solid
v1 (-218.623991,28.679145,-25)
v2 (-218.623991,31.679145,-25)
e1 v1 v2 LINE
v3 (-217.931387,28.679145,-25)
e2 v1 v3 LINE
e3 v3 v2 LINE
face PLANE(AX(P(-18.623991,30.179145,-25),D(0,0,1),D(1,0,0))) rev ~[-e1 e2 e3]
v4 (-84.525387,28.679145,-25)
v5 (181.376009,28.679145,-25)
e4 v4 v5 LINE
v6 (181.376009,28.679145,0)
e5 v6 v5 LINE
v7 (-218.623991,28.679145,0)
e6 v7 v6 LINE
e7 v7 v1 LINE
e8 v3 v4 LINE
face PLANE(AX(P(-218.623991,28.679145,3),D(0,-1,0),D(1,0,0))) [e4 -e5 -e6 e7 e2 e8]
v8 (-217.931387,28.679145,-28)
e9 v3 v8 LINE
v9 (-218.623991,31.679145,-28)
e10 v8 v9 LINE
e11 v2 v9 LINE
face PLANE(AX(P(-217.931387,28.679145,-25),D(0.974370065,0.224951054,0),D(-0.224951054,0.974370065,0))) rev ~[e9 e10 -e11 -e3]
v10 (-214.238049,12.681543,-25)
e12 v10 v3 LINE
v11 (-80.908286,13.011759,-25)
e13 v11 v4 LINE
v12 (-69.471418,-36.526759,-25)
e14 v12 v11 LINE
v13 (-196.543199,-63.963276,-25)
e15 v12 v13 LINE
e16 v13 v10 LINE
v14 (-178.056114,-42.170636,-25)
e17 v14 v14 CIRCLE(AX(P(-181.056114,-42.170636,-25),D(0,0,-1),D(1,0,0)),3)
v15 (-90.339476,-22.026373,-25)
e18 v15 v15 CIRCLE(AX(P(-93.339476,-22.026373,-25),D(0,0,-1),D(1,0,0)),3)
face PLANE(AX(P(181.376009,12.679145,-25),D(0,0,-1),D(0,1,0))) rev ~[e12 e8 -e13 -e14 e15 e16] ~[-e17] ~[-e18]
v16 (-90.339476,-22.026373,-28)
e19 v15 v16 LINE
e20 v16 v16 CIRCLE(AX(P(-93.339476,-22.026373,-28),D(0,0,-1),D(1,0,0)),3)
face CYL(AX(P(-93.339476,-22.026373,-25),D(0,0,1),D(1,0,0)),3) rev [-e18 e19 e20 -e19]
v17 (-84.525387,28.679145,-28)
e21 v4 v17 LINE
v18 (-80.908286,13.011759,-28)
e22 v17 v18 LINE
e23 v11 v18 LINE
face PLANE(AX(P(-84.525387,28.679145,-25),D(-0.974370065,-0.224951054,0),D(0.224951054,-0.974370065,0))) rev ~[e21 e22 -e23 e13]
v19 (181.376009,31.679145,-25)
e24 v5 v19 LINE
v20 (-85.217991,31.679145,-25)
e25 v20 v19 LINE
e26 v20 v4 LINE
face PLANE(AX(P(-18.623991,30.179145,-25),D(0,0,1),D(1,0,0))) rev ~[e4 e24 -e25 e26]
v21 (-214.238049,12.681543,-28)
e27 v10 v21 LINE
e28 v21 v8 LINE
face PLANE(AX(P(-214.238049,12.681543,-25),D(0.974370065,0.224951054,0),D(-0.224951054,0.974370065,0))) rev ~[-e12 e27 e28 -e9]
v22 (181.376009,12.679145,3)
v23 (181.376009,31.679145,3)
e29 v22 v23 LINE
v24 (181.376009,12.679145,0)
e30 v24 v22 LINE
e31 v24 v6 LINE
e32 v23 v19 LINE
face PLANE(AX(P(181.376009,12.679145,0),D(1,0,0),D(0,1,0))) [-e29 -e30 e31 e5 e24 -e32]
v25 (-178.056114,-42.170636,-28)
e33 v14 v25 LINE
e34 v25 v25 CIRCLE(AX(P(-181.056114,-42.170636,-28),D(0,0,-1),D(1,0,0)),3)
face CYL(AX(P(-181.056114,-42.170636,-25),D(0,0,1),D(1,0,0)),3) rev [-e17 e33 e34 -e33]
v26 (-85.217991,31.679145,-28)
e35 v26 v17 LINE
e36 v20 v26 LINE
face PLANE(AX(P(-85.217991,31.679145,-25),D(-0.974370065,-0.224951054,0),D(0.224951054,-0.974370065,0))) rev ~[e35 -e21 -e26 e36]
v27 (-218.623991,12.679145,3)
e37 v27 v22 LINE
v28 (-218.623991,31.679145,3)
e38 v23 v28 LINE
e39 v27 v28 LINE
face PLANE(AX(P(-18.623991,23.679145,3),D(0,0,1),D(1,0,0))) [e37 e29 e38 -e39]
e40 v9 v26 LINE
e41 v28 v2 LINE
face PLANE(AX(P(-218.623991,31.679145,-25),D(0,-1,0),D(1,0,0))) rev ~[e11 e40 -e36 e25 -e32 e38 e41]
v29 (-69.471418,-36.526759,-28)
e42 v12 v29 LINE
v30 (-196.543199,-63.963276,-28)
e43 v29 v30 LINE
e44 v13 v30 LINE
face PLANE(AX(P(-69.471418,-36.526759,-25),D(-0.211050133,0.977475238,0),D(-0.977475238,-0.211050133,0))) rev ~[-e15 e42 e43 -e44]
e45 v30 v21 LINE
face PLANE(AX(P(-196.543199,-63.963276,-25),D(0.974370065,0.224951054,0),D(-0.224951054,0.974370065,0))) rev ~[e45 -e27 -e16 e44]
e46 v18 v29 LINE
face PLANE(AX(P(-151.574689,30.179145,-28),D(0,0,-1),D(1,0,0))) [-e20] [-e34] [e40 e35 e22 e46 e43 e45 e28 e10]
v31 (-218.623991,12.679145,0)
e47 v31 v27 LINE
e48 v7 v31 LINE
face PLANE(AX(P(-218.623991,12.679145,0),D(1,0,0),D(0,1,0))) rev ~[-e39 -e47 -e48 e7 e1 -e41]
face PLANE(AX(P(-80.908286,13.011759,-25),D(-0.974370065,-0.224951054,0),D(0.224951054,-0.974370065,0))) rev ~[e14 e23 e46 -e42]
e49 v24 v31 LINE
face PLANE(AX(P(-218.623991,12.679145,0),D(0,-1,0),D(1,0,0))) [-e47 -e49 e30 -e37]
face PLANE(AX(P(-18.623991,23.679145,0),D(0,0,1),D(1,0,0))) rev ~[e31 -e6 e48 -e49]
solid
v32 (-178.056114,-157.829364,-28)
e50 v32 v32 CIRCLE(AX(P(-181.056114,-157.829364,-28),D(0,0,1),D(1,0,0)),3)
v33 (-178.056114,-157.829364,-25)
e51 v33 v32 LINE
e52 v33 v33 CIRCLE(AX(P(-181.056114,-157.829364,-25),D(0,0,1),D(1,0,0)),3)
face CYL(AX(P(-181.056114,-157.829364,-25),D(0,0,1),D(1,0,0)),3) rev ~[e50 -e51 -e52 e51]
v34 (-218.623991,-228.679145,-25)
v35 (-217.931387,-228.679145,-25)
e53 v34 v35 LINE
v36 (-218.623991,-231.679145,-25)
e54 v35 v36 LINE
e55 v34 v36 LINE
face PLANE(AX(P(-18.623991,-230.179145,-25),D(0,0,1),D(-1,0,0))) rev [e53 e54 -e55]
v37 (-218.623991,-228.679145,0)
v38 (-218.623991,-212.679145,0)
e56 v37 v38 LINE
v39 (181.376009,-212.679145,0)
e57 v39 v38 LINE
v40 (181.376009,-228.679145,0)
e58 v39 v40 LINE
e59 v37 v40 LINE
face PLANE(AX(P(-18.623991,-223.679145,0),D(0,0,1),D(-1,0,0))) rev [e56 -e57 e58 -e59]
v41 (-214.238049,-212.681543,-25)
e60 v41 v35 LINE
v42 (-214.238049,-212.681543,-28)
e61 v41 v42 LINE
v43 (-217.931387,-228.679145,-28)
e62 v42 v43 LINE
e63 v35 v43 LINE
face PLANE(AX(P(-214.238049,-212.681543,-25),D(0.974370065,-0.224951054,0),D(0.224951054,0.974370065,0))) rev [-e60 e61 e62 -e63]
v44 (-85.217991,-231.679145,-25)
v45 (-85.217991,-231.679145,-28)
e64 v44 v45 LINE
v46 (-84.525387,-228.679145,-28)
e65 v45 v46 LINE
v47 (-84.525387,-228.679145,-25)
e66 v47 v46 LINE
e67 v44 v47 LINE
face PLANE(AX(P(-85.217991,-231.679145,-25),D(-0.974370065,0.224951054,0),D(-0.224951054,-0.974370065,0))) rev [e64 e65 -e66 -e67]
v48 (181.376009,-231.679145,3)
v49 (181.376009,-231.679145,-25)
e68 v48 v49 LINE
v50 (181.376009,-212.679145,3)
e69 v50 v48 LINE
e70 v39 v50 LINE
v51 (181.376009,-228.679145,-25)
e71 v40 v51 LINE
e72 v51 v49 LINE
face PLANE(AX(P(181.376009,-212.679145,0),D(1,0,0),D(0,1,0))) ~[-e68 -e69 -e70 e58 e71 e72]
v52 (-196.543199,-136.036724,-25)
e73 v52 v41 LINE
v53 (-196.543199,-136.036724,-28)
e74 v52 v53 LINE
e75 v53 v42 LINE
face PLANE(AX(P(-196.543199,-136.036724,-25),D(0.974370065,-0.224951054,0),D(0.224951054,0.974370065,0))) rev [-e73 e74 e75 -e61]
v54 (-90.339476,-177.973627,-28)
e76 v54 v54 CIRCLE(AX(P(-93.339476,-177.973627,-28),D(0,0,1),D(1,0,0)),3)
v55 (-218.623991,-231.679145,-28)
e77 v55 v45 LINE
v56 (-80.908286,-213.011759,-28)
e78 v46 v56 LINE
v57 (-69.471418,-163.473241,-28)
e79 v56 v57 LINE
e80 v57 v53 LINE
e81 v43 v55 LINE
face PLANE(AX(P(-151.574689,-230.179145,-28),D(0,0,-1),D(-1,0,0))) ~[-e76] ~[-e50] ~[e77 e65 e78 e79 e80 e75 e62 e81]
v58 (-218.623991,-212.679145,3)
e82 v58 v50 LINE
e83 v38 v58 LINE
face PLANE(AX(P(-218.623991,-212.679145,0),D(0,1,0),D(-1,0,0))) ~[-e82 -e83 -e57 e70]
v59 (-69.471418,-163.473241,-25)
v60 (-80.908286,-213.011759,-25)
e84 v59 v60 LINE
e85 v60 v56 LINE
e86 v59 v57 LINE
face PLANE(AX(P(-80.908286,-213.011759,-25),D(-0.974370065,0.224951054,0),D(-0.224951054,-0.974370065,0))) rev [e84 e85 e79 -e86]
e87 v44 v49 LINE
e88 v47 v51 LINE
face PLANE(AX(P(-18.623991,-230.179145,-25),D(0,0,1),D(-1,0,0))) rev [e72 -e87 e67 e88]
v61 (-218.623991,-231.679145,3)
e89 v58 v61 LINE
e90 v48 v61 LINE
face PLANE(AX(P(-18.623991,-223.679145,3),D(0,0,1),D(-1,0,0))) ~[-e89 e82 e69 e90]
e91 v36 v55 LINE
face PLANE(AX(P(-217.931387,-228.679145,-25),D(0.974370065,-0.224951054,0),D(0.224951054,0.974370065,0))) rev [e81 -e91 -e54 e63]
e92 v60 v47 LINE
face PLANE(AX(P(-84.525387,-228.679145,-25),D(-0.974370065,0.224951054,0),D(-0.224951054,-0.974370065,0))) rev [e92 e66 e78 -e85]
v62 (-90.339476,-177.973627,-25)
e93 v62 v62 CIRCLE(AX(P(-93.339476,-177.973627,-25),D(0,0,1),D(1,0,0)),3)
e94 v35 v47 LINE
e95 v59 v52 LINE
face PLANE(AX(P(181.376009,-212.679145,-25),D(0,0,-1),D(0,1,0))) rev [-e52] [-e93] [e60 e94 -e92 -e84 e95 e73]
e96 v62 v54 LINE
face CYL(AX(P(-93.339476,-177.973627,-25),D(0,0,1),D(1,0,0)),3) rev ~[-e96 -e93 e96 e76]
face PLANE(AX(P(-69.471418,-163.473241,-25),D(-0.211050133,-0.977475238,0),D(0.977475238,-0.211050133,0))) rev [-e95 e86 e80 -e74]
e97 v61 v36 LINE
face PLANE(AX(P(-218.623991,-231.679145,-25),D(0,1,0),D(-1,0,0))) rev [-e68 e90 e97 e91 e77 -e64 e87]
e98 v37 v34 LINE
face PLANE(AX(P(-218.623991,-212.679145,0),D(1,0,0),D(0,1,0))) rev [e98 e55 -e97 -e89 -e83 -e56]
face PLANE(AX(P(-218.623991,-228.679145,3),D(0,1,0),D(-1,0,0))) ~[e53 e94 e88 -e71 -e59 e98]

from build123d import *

# Parameters (mm, degrees)
F0_W     = 400
F0_H     = 3
F1_DEPTH = 3
F3_DEPTH = 25
F4_W     = 400
F4_H     = 3
F5_DEPTH = 28
F6_R     = 3
F7_DEPTH = 3
F8_W     = 3
F8_H     = 25
F9_DEPTH = 400.001


# Not quite as in the source:
# - a feature names something its author has since deleted; it is built from what else it names


with BuildPart() as f1:
    # F0 (on Top) → F1 (new body)
    with BuildSketch(Plane.XY):
        Polygon((-18.623991464, 31.679145366), (-218.623991464, 31.679145366), (-218.623991464, 15.679145366), (181.376008536, 15.679145366), (181.376008536, 31.679145366), align=None)
        with Locations((-18.623991464, 14.179145366)):
            Rectangle(F0_W, F0_H)
    extrude(amount=F1_DEPTH)

    # F0 (on Top) → F3 (join)
    with BuildSketch(Plane.XY):
        with Locations((-18.623991464, 14.179145366)):
            Rectangle(F0_W, F0_H)
    extrude(amount=-F3_DEPTH)

    # F4 (on face) → F5 (join)
    with BuildSketch(Plane.XY.offset(3)):
        with Locations((-18.623991464, 30.179145366)):
            Rectangle(F4_W, F4_H)
    extrude(amount=-F5_DEPTH)

    # F6 (on face) → F7 (join)
    with BuildSketch(Plane(origin=(0, 0, -25), x_dir=(1, 0, 0), z_dir=(0, 0, -1))):
        Polygon((-84.5253868028, -28.679145366), (-217.9313868906, -28.679145366), (-218.623991464, -31.679145366), (-85.2179913762, -31.679145366), align=None)
        Polygon((-69.4714175721, 36.526759169), (-196.5431985444, 63.9632764502), (-214.2380493628, -12.6815429686), (-217.9313868906, -28.679145366), (-84.5253868028, -28.679145366), (-80.9082856553, -13.0117590105), align=None)
        with Locations((-93.339475505, 22.0263727619)):
            Circle(F6_R, mode=Mode.SUBTRACT)
        with Locations((-181.0561138573, 42.1706363664)):
            Circle(F6_R, mode=Mode.SUBTRACT)
    extrude(amount=F7_DEPTH)

    # F8 (on face) → F9 (cut, through all)
    with BuildSketch(Plane.YZ.offset(181.376008536)):
        with Locations((14.179145366, -12.5)):
            Rectangle(F8_W, F8_H)
    extrude(amount=-F9_DEPTH, mode=Mode.SUBTRACT)


with BuildPart() as f10_1:
    # F10: instance of F1
    add(f1.part.mirror(Plane.XZ.offset(100)))


solid = Compound([f1.part, f10_1.part])
